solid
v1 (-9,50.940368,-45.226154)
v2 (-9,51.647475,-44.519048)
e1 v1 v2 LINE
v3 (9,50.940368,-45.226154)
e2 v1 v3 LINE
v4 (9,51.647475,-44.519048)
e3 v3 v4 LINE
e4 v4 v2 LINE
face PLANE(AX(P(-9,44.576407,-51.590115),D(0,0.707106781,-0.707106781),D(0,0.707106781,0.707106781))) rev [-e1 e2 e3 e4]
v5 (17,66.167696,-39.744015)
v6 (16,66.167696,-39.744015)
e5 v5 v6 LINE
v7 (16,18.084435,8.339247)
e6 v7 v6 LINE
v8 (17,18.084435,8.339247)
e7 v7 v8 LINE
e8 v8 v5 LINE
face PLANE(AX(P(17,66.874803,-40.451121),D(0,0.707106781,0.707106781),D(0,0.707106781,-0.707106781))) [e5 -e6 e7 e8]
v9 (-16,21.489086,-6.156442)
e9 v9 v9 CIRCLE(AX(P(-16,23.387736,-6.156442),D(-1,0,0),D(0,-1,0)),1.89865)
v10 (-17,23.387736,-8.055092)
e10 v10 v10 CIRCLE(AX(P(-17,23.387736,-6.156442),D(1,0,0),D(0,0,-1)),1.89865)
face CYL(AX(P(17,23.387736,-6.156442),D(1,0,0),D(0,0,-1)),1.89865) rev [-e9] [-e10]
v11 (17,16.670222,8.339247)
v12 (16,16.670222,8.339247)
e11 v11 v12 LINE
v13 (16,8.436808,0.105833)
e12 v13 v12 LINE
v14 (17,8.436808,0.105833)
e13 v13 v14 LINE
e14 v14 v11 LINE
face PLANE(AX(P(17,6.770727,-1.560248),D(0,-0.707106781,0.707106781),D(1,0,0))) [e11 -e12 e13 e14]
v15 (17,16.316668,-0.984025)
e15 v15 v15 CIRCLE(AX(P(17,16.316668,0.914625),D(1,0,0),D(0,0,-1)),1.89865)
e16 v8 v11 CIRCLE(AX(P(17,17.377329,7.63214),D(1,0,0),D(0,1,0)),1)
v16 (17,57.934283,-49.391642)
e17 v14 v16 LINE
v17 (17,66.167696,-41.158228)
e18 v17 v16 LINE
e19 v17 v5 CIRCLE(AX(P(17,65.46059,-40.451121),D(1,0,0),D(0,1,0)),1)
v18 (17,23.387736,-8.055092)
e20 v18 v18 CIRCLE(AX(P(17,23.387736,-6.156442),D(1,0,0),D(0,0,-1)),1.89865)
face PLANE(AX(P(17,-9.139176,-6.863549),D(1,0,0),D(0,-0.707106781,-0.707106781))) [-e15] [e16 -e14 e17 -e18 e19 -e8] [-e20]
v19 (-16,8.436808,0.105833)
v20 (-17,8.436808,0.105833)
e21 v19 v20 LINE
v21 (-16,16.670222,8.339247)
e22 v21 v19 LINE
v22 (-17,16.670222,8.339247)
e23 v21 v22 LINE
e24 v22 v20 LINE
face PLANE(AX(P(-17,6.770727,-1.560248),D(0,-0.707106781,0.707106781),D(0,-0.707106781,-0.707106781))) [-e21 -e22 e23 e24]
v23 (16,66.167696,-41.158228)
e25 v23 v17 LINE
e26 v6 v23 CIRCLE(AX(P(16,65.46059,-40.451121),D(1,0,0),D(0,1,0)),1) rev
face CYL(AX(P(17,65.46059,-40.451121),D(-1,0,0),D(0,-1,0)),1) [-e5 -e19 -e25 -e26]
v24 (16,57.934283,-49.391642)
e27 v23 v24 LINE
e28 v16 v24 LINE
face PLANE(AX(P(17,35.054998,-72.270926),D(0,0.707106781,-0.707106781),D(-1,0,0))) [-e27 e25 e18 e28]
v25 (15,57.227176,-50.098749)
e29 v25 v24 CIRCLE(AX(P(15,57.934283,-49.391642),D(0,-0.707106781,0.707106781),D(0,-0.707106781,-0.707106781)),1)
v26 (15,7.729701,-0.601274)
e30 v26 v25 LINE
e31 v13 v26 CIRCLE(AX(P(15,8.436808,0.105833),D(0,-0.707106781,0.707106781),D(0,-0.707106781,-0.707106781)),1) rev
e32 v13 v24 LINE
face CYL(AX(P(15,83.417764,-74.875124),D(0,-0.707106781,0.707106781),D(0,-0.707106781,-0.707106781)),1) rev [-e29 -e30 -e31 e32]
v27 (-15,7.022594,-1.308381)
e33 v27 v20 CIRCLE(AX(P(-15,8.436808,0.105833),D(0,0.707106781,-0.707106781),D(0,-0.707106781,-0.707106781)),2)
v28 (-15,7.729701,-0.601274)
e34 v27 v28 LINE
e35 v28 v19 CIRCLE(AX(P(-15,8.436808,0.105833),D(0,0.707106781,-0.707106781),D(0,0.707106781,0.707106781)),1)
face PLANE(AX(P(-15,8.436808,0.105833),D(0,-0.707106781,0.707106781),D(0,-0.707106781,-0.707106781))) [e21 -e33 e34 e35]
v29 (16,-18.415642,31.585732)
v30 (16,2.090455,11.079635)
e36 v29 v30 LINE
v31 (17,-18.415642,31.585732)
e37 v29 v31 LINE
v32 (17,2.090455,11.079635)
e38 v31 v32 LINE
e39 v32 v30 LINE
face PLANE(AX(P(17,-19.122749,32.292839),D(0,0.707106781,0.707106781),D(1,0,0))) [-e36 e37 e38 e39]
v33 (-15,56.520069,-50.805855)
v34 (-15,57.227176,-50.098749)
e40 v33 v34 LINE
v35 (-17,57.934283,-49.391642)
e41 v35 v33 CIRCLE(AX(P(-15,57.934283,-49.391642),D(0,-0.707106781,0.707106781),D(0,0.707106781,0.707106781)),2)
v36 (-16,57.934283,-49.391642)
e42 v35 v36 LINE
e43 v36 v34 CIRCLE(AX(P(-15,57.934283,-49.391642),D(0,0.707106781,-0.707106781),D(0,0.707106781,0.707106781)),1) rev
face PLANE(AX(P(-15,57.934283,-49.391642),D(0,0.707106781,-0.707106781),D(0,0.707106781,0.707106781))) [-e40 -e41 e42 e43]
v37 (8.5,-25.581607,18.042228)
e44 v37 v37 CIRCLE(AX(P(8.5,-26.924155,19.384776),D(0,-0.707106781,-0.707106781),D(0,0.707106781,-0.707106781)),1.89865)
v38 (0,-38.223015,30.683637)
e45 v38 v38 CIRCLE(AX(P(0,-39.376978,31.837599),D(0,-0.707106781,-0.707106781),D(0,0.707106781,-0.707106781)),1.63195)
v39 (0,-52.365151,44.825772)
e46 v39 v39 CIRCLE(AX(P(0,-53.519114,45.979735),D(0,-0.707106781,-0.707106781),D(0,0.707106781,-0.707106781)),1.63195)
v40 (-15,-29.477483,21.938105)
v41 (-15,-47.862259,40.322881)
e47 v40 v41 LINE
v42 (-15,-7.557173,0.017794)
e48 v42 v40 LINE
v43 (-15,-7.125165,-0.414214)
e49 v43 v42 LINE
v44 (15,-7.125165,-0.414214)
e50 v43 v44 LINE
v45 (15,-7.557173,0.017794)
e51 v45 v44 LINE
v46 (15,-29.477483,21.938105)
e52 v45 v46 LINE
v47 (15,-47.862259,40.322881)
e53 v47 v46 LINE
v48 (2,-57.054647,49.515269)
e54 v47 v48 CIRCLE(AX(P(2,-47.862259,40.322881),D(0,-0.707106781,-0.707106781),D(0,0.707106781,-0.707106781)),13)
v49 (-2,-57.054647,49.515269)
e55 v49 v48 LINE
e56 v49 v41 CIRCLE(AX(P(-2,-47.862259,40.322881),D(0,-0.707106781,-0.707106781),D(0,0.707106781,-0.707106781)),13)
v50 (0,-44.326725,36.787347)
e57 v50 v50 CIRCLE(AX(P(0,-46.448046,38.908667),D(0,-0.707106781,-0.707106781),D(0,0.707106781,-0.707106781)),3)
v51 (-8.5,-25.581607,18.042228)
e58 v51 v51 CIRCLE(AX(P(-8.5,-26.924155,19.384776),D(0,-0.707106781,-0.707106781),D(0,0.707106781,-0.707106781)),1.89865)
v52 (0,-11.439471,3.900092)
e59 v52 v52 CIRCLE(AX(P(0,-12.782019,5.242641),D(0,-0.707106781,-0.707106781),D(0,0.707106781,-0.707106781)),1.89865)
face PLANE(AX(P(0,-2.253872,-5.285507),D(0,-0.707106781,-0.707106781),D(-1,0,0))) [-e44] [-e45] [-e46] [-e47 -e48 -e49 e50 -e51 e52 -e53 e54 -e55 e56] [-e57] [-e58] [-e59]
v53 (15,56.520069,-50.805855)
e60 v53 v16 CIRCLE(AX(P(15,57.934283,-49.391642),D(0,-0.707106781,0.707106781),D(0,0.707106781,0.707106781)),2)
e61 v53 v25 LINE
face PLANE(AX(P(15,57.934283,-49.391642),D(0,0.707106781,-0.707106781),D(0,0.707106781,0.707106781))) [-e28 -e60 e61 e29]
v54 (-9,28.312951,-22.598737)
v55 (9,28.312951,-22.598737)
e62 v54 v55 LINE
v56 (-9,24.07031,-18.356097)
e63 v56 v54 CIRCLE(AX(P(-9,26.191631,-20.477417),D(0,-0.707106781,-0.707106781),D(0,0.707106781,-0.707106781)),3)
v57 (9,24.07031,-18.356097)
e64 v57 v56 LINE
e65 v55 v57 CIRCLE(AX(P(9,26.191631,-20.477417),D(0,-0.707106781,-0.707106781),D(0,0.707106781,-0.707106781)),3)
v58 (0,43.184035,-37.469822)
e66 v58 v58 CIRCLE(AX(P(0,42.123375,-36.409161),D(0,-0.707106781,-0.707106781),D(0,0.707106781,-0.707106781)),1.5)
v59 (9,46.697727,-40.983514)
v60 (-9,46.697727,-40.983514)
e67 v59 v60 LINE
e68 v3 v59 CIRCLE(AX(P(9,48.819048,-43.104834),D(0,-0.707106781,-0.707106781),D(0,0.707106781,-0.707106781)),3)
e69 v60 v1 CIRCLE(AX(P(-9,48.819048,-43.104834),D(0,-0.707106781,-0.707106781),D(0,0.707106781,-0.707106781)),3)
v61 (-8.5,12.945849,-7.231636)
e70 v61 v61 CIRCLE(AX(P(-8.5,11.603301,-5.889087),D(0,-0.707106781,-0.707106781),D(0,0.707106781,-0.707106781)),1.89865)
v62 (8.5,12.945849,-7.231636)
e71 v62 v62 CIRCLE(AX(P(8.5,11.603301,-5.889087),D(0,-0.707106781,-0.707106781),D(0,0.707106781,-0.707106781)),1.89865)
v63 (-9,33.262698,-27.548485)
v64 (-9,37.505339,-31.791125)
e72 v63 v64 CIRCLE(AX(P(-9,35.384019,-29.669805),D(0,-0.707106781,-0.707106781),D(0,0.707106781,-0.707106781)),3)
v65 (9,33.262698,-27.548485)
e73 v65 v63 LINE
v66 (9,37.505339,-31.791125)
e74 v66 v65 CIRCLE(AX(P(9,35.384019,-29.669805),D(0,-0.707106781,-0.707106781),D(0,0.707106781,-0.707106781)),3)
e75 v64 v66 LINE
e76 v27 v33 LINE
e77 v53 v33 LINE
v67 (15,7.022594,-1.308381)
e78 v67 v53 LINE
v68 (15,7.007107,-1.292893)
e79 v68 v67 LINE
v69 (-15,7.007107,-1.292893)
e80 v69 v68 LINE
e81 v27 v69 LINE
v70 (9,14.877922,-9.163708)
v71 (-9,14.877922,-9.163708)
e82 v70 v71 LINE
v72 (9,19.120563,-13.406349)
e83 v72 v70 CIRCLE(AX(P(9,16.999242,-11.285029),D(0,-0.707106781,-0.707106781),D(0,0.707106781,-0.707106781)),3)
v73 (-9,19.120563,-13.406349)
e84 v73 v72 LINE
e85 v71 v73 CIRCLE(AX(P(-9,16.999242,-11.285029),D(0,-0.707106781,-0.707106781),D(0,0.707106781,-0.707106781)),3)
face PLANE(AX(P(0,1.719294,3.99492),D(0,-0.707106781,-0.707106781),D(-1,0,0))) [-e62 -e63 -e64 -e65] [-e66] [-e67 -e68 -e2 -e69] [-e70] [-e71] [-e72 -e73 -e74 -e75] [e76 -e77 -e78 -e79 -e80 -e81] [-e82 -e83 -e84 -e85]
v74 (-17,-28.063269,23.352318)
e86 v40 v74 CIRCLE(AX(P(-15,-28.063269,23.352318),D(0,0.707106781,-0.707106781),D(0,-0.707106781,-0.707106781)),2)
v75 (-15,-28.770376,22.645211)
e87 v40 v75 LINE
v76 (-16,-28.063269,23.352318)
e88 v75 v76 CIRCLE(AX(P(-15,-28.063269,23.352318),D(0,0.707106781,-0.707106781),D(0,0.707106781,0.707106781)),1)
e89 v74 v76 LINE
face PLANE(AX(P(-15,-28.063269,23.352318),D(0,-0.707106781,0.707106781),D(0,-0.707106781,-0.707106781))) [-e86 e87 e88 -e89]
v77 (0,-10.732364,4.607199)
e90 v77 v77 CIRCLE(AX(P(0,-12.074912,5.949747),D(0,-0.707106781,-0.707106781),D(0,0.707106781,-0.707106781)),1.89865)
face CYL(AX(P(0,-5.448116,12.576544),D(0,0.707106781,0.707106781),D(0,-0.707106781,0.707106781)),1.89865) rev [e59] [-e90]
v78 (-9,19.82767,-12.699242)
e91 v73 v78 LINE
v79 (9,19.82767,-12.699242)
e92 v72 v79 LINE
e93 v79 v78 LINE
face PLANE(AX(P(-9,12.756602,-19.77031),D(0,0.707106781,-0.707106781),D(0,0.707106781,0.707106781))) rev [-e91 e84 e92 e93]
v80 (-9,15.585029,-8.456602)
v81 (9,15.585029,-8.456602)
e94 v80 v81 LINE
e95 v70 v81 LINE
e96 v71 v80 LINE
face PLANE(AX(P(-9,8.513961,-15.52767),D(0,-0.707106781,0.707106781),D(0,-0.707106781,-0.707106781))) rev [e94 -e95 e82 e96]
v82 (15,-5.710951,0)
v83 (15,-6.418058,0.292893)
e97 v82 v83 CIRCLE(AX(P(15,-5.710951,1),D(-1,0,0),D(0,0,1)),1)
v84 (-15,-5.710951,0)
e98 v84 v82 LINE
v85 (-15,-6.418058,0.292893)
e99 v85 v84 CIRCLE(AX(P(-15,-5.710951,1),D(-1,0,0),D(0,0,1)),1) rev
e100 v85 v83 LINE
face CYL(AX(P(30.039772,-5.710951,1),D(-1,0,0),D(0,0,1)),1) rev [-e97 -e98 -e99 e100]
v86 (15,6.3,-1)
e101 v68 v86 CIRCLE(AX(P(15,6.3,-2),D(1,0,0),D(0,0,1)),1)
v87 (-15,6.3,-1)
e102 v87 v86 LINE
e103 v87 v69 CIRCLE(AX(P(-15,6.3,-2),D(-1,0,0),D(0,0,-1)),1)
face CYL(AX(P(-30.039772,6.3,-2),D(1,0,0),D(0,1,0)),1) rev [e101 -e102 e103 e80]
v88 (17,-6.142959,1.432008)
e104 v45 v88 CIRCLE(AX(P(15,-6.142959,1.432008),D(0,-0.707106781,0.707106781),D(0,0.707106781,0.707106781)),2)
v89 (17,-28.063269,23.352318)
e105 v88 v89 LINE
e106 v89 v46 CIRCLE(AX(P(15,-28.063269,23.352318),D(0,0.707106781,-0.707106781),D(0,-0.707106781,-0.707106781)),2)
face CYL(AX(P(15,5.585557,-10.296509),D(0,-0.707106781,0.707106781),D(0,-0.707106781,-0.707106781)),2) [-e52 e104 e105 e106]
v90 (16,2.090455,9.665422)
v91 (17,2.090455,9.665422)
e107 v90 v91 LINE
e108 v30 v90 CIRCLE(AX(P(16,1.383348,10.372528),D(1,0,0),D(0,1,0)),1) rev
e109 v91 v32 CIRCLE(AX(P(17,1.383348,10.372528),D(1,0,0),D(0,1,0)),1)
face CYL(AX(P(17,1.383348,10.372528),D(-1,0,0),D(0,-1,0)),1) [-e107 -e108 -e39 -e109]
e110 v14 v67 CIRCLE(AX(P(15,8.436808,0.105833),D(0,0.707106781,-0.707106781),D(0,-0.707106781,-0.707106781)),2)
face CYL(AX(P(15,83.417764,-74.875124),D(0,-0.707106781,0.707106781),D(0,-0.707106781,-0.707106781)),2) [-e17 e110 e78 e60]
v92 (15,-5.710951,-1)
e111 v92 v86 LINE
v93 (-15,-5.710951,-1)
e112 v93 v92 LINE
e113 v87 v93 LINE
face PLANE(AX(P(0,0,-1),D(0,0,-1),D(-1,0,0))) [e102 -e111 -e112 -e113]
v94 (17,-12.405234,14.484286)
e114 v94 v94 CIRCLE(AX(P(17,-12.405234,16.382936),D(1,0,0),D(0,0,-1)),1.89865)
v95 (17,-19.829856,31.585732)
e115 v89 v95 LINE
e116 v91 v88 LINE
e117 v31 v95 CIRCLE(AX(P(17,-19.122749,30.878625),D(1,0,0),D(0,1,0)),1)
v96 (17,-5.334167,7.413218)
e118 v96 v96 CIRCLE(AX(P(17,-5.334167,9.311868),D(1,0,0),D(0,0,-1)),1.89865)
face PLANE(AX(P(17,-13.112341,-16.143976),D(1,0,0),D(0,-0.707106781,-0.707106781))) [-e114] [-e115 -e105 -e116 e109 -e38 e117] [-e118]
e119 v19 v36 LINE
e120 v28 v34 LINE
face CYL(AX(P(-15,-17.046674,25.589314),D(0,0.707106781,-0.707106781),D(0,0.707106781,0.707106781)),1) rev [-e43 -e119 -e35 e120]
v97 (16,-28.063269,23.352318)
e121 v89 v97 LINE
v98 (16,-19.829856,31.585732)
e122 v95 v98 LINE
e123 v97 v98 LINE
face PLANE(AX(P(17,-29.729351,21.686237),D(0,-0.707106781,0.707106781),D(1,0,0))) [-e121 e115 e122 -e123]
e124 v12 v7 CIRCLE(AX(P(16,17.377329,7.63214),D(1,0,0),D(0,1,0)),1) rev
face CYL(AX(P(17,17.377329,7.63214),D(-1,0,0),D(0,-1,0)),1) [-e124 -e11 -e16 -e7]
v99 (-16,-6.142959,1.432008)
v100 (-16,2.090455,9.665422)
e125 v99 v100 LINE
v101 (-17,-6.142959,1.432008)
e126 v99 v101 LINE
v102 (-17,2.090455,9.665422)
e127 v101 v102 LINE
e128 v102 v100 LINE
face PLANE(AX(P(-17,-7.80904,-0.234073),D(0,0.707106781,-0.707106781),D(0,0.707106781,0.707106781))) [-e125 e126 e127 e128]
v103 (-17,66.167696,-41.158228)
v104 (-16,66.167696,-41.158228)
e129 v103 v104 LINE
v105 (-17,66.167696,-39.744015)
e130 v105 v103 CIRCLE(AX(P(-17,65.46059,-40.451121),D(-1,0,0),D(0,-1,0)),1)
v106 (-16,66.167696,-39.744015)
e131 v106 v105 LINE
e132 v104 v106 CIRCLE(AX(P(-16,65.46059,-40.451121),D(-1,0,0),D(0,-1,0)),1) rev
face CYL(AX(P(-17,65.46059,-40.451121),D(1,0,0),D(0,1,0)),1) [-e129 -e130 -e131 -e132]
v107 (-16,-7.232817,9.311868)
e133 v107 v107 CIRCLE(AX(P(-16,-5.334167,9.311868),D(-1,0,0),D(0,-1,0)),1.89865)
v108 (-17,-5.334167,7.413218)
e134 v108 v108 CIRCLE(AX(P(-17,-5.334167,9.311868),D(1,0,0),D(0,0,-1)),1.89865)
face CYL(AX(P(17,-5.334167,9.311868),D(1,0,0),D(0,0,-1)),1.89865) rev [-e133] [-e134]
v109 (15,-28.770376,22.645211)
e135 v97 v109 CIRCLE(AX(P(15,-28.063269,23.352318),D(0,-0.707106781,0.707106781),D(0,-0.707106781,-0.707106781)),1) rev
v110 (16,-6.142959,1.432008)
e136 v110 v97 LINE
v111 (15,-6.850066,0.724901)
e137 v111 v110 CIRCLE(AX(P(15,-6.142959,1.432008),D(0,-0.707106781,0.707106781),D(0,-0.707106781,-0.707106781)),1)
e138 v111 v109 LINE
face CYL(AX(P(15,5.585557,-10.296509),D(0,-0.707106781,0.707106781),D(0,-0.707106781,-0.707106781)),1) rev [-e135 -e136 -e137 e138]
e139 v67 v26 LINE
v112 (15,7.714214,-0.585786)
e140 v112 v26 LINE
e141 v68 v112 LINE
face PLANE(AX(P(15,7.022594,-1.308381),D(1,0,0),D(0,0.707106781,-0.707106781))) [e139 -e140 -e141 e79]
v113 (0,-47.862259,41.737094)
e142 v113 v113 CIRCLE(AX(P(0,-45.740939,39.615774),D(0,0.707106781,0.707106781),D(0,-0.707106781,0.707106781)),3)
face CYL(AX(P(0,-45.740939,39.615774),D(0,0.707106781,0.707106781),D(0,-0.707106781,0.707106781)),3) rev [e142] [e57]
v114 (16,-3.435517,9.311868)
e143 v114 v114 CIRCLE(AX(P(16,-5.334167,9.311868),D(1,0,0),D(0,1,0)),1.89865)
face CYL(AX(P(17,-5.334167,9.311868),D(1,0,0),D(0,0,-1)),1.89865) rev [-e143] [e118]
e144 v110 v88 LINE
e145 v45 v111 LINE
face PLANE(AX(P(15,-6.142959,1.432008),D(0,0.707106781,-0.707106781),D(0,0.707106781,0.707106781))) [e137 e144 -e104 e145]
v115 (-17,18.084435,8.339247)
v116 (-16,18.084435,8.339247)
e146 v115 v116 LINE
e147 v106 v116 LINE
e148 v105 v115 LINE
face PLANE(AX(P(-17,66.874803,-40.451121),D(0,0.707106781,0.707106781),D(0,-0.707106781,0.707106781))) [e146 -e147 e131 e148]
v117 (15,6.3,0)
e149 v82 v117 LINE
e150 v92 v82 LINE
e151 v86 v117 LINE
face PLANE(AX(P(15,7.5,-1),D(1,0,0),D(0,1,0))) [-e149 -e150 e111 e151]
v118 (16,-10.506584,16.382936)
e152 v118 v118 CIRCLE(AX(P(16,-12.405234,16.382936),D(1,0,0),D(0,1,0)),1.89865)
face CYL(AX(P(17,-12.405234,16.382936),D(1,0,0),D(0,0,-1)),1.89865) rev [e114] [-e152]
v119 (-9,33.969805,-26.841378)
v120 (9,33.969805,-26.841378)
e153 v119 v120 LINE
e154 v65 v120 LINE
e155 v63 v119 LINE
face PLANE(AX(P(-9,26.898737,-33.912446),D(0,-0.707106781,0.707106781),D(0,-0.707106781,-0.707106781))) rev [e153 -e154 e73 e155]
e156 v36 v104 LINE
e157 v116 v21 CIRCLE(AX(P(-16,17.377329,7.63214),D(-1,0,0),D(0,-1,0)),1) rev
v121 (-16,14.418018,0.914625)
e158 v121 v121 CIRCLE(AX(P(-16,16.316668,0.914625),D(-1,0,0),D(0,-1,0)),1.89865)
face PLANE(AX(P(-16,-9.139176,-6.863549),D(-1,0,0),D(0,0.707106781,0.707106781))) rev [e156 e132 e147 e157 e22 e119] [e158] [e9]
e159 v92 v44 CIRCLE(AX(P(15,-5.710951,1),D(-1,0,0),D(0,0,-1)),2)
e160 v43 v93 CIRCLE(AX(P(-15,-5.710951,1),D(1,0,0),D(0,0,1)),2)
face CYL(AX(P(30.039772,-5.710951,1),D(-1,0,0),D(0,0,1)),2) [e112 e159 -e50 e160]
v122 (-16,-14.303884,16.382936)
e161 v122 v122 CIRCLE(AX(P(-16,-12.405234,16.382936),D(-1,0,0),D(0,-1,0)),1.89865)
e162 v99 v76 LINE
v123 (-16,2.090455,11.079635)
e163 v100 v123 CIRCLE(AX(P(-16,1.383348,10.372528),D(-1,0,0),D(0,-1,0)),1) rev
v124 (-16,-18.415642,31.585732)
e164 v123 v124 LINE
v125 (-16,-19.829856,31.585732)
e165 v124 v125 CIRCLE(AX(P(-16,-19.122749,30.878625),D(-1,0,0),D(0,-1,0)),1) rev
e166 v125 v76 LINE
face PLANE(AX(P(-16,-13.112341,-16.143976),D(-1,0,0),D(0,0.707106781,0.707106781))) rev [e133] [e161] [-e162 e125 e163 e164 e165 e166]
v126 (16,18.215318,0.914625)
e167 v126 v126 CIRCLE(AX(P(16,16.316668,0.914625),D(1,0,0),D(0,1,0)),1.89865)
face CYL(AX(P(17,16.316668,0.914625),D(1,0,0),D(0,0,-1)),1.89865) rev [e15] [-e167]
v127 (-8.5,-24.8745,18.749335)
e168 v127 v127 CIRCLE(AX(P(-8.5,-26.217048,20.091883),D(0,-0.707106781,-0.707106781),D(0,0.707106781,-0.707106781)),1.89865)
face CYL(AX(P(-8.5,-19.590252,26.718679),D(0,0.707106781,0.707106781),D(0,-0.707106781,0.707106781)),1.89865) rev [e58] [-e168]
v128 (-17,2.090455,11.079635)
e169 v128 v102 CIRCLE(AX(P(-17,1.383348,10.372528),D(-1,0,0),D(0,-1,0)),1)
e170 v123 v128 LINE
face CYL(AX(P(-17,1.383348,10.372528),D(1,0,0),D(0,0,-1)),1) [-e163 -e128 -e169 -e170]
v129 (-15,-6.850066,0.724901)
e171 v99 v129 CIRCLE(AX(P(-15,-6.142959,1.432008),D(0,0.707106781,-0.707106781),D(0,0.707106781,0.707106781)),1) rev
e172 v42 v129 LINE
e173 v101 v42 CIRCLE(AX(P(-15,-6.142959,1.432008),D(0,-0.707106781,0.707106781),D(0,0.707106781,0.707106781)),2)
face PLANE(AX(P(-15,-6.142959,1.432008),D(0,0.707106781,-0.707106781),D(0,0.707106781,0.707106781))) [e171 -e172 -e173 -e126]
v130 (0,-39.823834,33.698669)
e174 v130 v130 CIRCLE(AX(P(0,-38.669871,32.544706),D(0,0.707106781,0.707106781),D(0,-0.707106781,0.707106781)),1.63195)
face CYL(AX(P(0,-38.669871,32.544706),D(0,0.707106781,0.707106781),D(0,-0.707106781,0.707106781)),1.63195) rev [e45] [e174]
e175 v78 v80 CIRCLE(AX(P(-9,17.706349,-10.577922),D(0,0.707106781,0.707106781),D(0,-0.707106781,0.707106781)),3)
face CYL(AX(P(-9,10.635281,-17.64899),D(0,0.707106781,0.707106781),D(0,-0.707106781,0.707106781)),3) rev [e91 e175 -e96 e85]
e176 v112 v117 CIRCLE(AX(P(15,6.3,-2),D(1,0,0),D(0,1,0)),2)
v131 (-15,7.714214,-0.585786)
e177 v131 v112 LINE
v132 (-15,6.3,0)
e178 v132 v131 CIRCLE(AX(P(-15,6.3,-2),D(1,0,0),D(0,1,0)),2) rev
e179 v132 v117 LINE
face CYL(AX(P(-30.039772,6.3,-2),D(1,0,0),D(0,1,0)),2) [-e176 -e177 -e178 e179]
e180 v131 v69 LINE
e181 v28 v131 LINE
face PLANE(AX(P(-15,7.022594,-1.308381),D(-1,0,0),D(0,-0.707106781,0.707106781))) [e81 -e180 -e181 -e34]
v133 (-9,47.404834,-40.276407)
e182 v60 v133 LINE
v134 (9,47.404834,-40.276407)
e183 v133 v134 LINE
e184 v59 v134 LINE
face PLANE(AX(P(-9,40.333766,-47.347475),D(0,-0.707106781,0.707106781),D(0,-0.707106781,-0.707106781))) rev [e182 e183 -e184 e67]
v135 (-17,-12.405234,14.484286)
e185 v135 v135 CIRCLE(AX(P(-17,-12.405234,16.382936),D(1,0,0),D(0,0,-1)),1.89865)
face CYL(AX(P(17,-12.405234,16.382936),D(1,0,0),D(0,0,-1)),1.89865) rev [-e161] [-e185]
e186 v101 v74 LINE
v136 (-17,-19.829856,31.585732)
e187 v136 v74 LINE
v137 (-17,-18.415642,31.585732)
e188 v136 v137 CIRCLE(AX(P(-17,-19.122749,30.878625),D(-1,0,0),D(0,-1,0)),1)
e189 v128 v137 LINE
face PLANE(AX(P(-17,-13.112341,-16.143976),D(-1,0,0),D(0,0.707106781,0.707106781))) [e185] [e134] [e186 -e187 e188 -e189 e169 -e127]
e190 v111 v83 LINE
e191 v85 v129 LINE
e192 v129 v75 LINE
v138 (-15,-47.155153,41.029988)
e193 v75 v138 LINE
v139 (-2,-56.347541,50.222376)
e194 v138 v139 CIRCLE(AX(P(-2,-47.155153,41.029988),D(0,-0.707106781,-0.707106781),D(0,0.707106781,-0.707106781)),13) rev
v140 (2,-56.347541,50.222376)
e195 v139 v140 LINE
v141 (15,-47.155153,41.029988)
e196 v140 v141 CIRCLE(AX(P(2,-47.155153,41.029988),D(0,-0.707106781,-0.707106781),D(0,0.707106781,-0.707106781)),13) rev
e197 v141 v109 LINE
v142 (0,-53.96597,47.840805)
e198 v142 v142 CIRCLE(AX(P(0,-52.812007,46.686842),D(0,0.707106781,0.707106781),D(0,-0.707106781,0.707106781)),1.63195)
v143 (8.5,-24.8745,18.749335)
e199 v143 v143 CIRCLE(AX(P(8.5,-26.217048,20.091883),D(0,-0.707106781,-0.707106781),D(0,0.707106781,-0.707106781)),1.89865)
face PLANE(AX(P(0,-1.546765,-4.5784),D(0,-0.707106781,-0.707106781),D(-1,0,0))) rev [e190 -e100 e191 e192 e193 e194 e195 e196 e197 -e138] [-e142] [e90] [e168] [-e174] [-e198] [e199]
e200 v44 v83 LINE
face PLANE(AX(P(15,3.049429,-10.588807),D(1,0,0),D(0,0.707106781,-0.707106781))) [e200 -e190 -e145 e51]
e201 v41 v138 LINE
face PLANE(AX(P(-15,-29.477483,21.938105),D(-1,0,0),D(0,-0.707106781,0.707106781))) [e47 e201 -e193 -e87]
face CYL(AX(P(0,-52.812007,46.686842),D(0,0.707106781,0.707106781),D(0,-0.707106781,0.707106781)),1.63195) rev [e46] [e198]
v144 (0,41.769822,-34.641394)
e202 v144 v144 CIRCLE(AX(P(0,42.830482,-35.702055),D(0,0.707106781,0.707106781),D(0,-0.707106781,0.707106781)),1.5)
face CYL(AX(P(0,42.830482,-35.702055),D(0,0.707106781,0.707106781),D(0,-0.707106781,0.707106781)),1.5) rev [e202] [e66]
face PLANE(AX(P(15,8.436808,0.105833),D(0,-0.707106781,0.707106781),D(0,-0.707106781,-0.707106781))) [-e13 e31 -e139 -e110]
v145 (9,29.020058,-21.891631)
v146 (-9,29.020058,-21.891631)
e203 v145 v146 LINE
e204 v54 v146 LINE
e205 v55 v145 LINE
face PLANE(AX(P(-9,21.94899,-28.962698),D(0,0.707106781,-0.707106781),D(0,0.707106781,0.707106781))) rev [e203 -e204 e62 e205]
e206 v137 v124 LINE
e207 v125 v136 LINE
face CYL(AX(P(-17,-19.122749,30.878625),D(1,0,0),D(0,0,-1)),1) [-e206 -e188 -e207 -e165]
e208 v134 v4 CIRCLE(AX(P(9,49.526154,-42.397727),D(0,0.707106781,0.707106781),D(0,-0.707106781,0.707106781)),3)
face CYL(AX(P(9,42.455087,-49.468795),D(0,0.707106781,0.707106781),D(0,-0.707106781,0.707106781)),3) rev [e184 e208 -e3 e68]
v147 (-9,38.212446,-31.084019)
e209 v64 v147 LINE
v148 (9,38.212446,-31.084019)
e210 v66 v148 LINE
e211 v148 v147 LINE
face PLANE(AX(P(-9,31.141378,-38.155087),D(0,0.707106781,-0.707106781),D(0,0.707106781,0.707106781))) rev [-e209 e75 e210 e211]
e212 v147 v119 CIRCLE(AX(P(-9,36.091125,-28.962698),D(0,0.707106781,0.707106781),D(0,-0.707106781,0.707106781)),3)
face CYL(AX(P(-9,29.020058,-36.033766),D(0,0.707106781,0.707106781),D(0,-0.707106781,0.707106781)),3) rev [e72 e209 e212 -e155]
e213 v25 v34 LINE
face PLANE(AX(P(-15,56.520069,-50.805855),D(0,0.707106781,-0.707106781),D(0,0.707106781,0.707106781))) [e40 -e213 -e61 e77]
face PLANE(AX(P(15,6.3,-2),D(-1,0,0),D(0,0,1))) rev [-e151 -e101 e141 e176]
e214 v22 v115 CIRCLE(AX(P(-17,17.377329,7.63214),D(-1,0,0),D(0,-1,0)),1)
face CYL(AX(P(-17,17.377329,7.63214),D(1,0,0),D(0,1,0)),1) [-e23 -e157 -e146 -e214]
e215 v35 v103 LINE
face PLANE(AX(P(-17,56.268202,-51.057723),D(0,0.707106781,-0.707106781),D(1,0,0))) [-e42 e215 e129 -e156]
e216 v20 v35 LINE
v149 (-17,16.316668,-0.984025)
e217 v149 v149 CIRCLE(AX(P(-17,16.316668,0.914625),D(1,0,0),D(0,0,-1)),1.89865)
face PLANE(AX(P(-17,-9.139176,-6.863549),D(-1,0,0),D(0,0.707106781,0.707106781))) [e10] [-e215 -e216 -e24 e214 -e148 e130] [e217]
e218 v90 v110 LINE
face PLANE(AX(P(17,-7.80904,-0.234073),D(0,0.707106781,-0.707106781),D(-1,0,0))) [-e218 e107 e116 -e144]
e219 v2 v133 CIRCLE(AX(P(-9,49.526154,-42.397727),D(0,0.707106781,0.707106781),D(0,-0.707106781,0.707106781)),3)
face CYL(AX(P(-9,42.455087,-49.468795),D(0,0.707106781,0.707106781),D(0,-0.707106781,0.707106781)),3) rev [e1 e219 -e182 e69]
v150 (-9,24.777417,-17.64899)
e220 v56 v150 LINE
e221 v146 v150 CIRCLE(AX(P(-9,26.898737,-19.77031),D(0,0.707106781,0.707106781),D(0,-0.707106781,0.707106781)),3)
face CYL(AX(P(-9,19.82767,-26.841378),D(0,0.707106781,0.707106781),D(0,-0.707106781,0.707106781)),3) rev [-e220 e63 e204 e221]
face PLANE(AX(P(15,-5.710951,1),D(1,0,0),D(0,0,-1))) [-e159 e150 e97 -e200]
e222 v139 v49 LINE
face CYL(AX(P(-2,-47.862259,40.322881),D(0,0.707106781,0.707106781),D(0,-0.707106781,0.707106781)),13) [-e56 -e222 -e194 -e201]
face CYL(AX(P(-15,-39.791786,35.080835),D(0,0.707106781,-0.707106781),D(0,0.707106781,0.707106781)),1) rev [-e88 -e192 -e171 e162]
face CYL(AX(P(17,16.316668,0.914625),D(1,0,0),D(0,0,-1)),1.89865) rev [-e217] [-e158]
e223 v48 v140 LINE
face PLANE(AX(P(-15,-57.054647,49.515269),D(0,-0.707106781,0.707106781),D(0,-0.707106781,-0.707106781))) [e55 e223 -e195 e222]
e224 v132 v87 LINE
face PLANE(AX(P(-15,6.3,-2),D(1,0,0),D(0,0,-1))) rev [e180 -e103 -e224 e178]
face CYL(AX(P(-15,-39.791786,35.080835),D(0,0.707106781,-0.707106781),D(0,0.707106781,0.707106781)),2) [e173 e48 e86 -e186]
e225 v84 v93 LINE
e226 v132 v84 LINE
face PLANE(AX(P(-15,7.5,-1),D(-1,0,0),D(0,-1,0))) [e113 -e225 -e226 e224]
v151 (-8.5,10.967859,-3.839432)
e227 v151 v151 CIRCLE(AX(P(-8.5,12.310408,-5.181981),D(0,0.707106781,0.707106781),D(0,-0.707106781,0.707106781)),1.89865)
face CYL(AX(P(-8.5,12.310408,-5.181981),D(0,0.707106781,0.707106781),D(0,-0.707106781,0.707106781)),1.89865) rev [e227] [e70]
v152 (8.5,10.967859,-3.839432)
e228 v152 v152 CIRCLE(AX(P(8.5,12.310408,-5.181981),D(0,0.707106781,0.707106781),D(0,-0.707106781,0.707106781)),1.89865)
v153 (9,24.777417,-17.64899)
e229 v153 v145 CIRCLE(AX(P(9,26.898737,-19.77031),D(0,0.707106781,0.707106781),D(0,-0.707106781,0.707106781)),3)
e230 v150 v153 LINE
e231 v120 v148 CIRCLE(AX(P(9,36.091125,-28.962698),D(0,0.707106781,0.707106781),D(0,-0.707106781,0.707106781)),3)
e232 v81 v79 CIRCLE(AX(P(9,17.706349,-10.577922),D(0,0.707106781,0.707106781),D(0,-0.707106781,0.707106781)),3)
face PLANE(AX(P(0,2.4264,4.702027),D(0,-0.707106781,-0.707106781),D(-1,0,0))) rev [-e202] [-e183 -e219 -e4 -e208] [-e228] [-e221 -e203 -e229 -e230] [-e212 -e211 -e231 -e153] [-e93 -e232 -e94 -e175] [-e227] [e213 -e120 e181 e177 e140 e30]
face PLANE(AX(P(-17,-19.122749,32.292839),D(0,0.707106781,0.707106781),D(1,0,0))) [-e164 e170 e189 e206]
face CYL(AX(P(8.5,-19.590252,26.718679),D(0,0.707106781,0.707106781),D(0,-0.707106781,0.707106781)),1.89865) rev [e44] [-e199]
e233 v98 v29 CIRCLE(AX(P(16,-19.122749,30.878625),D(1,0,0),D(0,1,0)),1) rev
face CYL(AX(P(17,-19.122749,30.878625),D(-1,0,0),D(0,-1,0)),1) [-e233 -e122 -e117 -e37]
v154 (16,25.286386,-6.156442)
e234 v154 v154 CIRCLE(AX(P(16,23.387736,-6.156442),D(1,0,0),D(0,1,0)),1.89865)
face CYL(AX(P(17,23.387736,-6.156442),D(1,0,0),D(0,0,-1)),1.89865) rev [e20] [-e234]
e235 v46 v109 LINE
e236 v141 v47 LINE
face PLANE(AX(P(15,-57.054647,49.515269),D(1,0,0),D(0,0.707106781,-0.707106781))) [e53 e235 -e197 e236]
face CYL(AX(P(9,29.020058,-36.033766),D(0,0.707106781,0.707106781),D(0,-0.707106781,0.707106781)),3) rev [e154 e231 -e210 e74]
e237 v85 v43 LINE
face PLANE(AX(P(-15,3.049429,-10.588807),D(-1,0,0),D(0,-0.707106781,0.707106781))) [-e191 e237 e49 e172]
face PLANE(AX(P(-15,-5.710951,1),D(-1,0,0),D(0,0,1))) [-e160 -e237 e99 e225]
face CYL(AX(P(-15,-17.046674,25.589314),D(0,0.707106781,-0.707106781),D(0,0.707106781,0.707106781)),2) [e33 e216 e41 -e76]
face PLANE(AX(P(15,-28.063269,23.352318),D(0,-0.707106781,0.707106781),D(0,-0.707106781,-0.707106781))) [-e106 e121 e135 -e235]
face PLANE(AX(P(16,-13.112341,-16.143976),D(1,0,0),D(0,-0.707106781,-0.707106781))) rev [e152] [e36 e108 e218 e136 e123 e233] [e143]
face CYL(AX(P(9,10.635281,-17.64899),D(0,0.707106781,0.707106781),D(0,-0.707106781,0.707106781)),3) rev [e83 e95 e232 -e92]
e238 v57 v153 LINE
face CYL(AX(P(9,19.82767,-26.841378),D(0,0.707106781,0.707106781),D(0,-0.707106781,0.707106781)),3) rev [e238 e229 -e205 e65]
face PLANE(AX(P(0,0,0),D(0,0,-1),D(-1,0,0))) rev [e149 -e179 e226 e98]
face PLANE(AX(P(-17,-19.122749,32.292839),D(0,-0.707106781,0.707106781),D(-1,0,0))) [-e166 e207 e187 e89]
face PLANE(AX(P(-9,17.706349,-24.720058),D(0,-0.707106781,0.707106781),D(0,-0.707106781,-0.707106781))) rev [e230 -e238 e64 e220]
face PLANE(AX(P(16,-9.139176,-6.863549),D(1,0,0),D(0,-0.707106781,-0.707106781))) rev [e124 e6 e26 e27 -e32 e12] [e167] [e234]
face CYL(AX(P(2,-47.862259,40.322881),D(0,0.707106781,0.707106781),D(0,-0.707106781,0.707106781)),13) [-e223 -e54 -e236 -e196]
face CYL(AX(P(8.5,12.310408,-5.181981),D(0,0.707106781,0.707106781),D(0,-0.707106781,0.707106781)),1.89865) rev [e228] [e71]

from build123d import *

# Parameters (mm, degrees)
BASE_FLANGE1_DEPTH     = 1
SKETCHED_START         = -30
SKETCHED_BEND5_DEPTH   = 60
SKETCHED_BEND5_2_DEPTH = 15
SKETCHED_START_2       = 15
SKETCHED_BEND5_3_DEPTH = 15
SKETCHED_BEND5_4_DEPTH = 60
SKETCHED_START_3       = -15
SKETCHED_BEND5_5_DEPTH = 30
SKETCHED_BEND6_DEPTH   = 60
SKETCHED_BEND6_2_DEPTH = 15
SKETCHED_BEND6_3_DEPTH = 15
SKETCHED_BEND6_4_DEPTH = 30
SKETCHED_BEND6_5_DEPTH = 60
SKETCHED_START_4       = -36.356310605
SKETCHED_BEND7_DEPTH   = 31
SKETCHED_BEND7_2_DEPTH = 31
SKETCHED_START_5       = 5.890889039
SKETCHED_BEND8_DEPTH   = 70
SKETCHED_BEND8_2_DEPTH = 70
CUT_EXTRUDE1_DEPTH     = 10
F_6_CLEARANCE_HOLE4_D  = 3.7973
F_6_CLEARANCE_HOLE2_D  = 3.7973
FILLET1_R              = 1
F_4_CLEARANCE_HOLE1_D  = 3.2639
F_6_0MM_DOWEL_HOLE1_D  = 6
F_3_0MM_DOWEL_HOLE1_D  = 3
FILLET2_R              = 13


# Read off the part's stored shape, not the designer's step: Sketched Bend5, Sketched Bend6, Sketched Bend7, Sketched Bend8
# Sheet-metal steps are written as plain solids
with BuildPart() as part:
    # Sketch1 → Base-Flange1 (new body)
    with BuildSketch(Plane.XY):
        Polygon((-30, -38.5), (-15, -38.5), (-15, -77.5), (15, -77.5), (15, -38.5), (30, -38.5), (30, -7.5), (15, -7.5), (15, 7.5), (30, 7.5), (30, 77.5), (15, 77.5), (-15, 77.5), (-30, 77.5), (-30, 7.5), (-15, 7.5), (-15, -7.5), (-30, -7.5), align=None)
    extrude(amount=-BASE_FLANGE1_DEPTH)

    # Sketched Bend5 outline → Sketched Bend5 (cut)
    with BuildSketch(Plane.YZ.offset(SKETCHED_START)):
        with BuildLine():
            Line((7.714213562, -0.585786438), (8.128427124, -1))
            Line((8.128427124, -1), (77.5, -1))
            Line((77.5, -1), (77.5, 0))
            Line((77.5, 0), (6.3, 0))
            ThreePointArc((6.3, 0), (7.065366865, -0.152240935), (7.714213562, -0.585786438))
        make_face()
    extrude(amount=SKETCHED_BEND5_DEPTH, mode=Mode.SUBTRACT)

    # Sketched Bend5 2 outline → Sketched Bend5 2 (cut)
    with BuildSketch(Plane.YZ.offset(SKETCHED_START)):
        with BuildLine():
            Line((7.729701149, -0.601274024), (7.714213562, -0.585786438))
            ThreePointArc((7.714213562, -0.585786438), (7.610403483, -0.48909209), (7.5, -0.4))
            Line((7.5, -0.4), (7.5, -0.830975173))
            Line((7.5, -0.830975173), (7.729701149, -0.601274024))
        make_face()
    extrude(amount=SKETCHED_BEND5_2_DEPTH, mode=Mode.SUBTRACT)

    # Sketched Bend5 3 outline → Sketched Bend5 3 (cut)
    with BuildSketch(Plane.YZ.offset(SKETCHED_START_2)):
        with BuildLine():
            Line((7.729701149, -0.601274024), (7.714213562, -0.585786438))
            ThreePointArc((7.714213562, -0.585786438), (7.610403483, -0.48909209), (7.5, -0.4))
            Line((7.5, -0.4), (7.5, -0.830975173))
            Line((7.5, -0.830975173), (7.729701149, -0.601274024))
        make_face()
    extrude(amount=SKETCHED_BEND5_3_DEPTH, mode=Mode.SUBTRACT)

    # Sketched Bend5 4 outline → Sketched Bend5 4 (add)
    with BuildSketch(Plane.YZ.offset(SKETCHED_START)):
        Polygon((57.227175832, -50.098748707), (8.128427124, -1), (7.5, -1), (7.5, -0.830975173), (7.022594368, -1.308380805), (56.520069051, -50.805855488), align=None)
    extrude(amount=SKETCHED_BEND5_4_DEPTH)

    # Sketched Bend5 5 outline → Sketched Bend5 5 (add)
    with BuildSketch(Plane.YZ.offset(SKETCHED_START_3)):
        with BuildLine():
            Line((7.022594368, -1.308380805), (7.330975173, -1))
            Line((7.330975173, -1), (6.3, -1))
            ThreePointArc((6.3, -1), (6.682683432, -1.076120467), (7.007106781, -1.292893219))
            Line((7.007106781, -1.292893219), (7.022594368, -1.308380805))
        make_face()
    extrude(amount=SKETCHED_BEND5_5_DEPTH)

    # Sketched Bend6 outline → Sketched Bend6 (cut)
    with BuildSketch(Plane.YZ.offset(SKETCHED_START)):
        with BuildLine():
            ThreePointArc((-5.710951377, -1), (-6.476318242, -0.847759065), (-7.12516494, -0.414213562))
            Line((-7.12516494, -0.414213562), (-7.539378502, 0))
            Line((-7.539378502, 0), (-77.5, 0))
            Line((-77.5, 0), (-77.5, -1))
            Line((-77.5, -1), (-5.710951377, -1))
        make_face()
    extrude(amount=SKETCHED_BEND6_DEPTH, mode=Mode.SUBTRACT)

    # Sketched Bend6 2 outline → Sketched Bend6 2 (cut)
    with BuildSketch(Plane.YZ.offset(SKETCHED_START)):
        Polygon((-7.539378502, 0), (-7.5, -0.039378502), (-7.5, 0), align=None)
    extrude(amount=SKETCHED_BEND6_2_DEPTH, mode=Mode.SUBTRACT)

    # Sketched Bend6 3 outline → Sketched Bend6 3 (cut)
    with BuildSketch(Plane.YZ.offset(SKETCHED_START_2)):
        Polygon((-7.539378502, 0), (-7.5, -0.039378502), (-7.5, 0), align=None)
    extrude(amount=SKETCHED_BEND6_3_DEPTH, mode=Mode.SUBTRACT)

    # Sketched Bend6 4 outline → Sketched Bend6 4 (add)
    with BuildSketch(Plane.YZ.offset(SKETCHED_START_3)):
        with BuildLine():
            Line((-7.539378502, 0), (-5.710951377, 0))
            ThreePointArc((-5.710951377, 0), (-6.09363481, 0.076120467), (-6.418058159, 0.292893219))
            Line((-6.418058159, 0.292893219), (-56.347540704, 50.222375764))
            Line((-56.347540704, 50.222375764), (-57.054647485, 49.515268983))
            Line((-57.054647485, 49.515268983), (-7.539378502, 0))
        make_face()
    extrude(amount=SKETCHED_BEND6_4_DEPTH)

    # Sketched Bend6 5 outline → Sketched Bend6 5 (add)
    with BuildSketch(Plane.YZ.offset(SKETCHED_START)):
        Polygon((-29.477483019, 21.938104517), (-7.557172802, 0.0177943), (-6.850066021, 0.724901081), (-28.770376238, 22.645211298), align=None)
    extrude(amount=SKETCHED_BEND6_5_DEPTH)

    # Sketched Bend7 outline → Sketched Bend7 (cut)
    with BuildSketch(Plane(origin=(0, 0, 0), x_dir=(1, 0, 0), z_dir=(0, 0.707106781186546, -0.707106781186549)).offset(SKETCHED_START_4)):
        with BuildLine():
            ThreePointArc((-16.732050807, 4.331145665), (-16, 5.063196472), (-15, 5.331145665))
            Line((-15, 5.331145665), (-30, 5.331145665))
            Line((-30, 5.331145665), (-30, 4.331145665))
            Line((-30, 4.331145665), (-16.732050807, 4.331145665))
        make_face()
        with BuildLine():
            Line((30, 5.331145665), (15, 5.331145665))
            ThreePointArc((15, 5.331145665), (16, 5.063196472), (16.732050807, 4.331145665))
            Line((16.732050807, 4.331145665), (30, 4.331145665))
            Line((30, 4.331145665), (30, 5.331145665))
        make_face()
    extrude(amount=SKETCHED_BEND7_DEPTH, mode=Mode.SUBTRACT)

    # Sketched Bend7 2 outline → Sketched Bend7 2 (add)
    with BuildSketch(Plane(origin=(0, 0, 0), x_dir=(1, 0, 0), z_dir=(0, 0.707106781186546, -0.707106781186549)).offset(SKETCHED_START_4)):
        with BuildLine():
            Line((-15, 4.331145665), (-16.732050807, 4.331145665))
            ThreePointArc((-16.732050807, 4.331145665), (-16.931851652, 3.848783755), (-17, 3.331145665))
            Line((-17, 3.331145665), (-17, -9.312659845))
            Line((-17, -9.312659845), (-16, -9.312659845))
            Line((-16, -9.312659845), (-16, 3.331145665))
            ThreePointArc((-16, 3.331145665), (-15.707106781, 4.038252446), (-15, 4.331145665))
        make_face()
        with BuildLine():
            ThreePointArc((17, 3.331145665), (16.931851652, 3.848783755), (16.732050807, 4.331145665))
            Line((16.732050807, 4.331145665), (15, 4.331145665))
            ThreePointArc((15, 4.331145665), (15.707106781, 4.038252446), (16, 3.331145665))
            Line((16, 3.331145665), (16, -9.312659845))
            Line((16, -9.312659845), (17, -9.312659845))
            Line((17, -9.312659845), (17, 3.331145665))
        make_face()
    extrude(amount=SKETCHED_BEND7_2_DEPTH)

    # Sketched Bend8 outline → Sketched Bend8 (cut)
    with BuildSketch(Plane(origin=(0, 0, 0), x_dir=(1, 0, 0), z_dir=(0, 0.707106781186546, -0.707106781186549)).offset(SKETCHED_START_5)):
        with BuildLine():
            Line((-30, -5.040559159), (-16.732050807, -5.040559159))
            ThreePointArc((-16.732050807, -5.040559159), (-16, -4.308508352), (-15, -4.040559159))
            Line((-15, -4.040559159), (-30, -4.040559159))
            Line((-30, -4.040559159), (-30, -5.040559159))
        make_face()
        with BuildLine():
            Line((30, -4.040559159), (15, -4.040559159))
            ThreePointArc((15, -4.040559159), (16, -4.308508352), (16.732050807, -5.040559159))
            Line((16.732050807, -5.040559159), (30, -5.040559159))
            Line((30, -5.040559159), (30, -4.040559159))
        make_face()
    extrude(amount=SKETCHED_BEND8_DEPTH, mode=Mode.SUBTRACT)

    # Sketched Bend8 2 outline → Sketched Bend8 2 (add)
    with BuildSketch(Plane(origin=(0, 0, 0), x_dir=(1, 0, 0), z_dir=(0, 0.707106781186546, -0.707106781186549)).offset(SKETCHED_START_5)):
        with BuildLine():
            ThreePointArc((-16.732050807, -5.040559159), (-16.931851652, -5.522921069), (-17, -6.040559159))
            Line((-17, -6.040559159), (-17, -18.684364669))
            Line((-17, -18.684364669), (-16, -18.684364669))
            Line((-16, -18.684364669), (-16, -6.040559159))
            ThreePointArc((-16, -6.040559159), (-15.707106781, -5.333452378), (-15, -5.040559159))
            Line((-15, -5.040559159), (-16.732050807, -5.040559159))
        make_face()
        with BuildLine():
            Line((16.732050807, -5.040559159), (15, -5.040559159))
            ThreePointArc((15, -5.040559159), (15.707106781, -5.333452378), (16, -6.040559159))
            Line((16, -6.040559159), (16, -18.684364669))
            Line((16, -18.684364669), (17, -18.684364669))
            Line((17, -18.684364669), (17, -6.040559159))
            ThreePointArc((17, -6.040559159), (16.931851652, -5.522921069), (16.732050807, -5.040559159))
        make_face()
    extrude(amount=SKETCHED_BEND8_2_DEPTH)

    # Sketch36 → Cut-Extrude1 (cut)
    with BuildSketch(Plane(origin=(0, 3.564213562, 3.564213562), x_dir=(1, 0, 0), z_dir=(0, 0.7071067811865487, 0.7071067811865465))):
        with BuildLine():
            Line((-9, 23), (9, 23))
            ThreePointArc((9, 23), (12, 20), (9, 17))
            Line((9, 17), (-9, 17))
            ThreePointArc((-9, 17), (-12, 20), (-9, 23))
        make_face()
        with BuildLine():
            Line((-9, 36), (9, 36))
            ThreePointArc((9, 36), (12, 33), (9, 30))
            Line((9, 30), (-9, 30))
            ThreePointArc((-9, 30), (-12, 33), (-9, 36))
        make_face()
        with BuildLine():
            Line((-9, 49), (9, 49))
            ThreePointArc((9, 49), (12, 46), (9, 43))
            Line((9, 43), (-9, 43))
            ThreePointArc((-9, 43), (-12, 46), (-9, 49))
        make_face()
        with BuildLine():
            Line((-9, 68), (9, 68))
            ThreePointArc((9, 68), (12, 65), (9, 62))
            Line((9, 62), (-9, 62))
            ThreePointArc((-9, 62), (-12, 65), (-9, 68))
        make_face()
    extrude(amount=-CUT_EXTRUDE1_DEPTH, mode=Mode.SUBTRACT)

    # #6 Clearance Hole4 (through all)
    with Locations(Plane(origin=(0, 3.564213562, 3.564213562), x_dir=(1, 0, 0), z_dir=(0, 0.7071067811865487, 0.7071067811865465))):
        with Locations((-8.5, 12.368986284), (8.5, 12.368986284), (0, -12.745359227), (-8.5, -32.745359227), (8.5, -32.745359227)):
            Hole(F_6_CLEARANCE_HOLE4_D / 2)

    # #6 Clearance Hole2 (through all)
    with Locations(Plane(origin=(17, 0, 0), x_dir=(0, 0, -1), z_dir=(1, 0, 0))):
        with Locations((-9.311868306, -5.334166607), (-16.382936118, -12.405234419), (-0.914625389, 16.316668374), (6.156442422, 23.387736186)):
            Hole(F_6_CLEARANCE_HOLE2_D / 2)

    # Fillet1
    fillet1_edges = [part.edges().sort_by_distance(p)[0] for p in [
        (-16.5, -19.12274884, 32.292838695),
        (-16.5, 2.797561376, 10.372528478),
        (16.5, 2.797561376, 10.372528478),
        (16.5, -19.12274884, 32.292838695),
        (-16.5, 17.377328546, 9.046353373),
        (-16.5, 66.874803229, -40.45112131),
        (16.5, 66.874803229, -40.45112131),
        (16.5, 17.377328546, 9.046353373),
    ]]
    fillet(fillet1_edges, radius=FILLET1_R)

    # #4 Clearance Hole1 (through all)
    with Locations(Plane(origin=(0, -3.06258247, -3.06258247), x_dir=(1, 0, 0), z_dir=(0, 0.7071067811865487, 0.7071067811865465))):
        with Locations((0, -70.356310605), (0, -50.356310605)):
            Hole(F_4_CLEARANCE_HOLE1_D / 2)

    # Ø6.0mm Dowel Hole1 (through all)
    with Locations(Plane(origin=(0, -3.06258247, -3.06258247), x_dir=(1, 0, 0), z_dir=(0, 0.7071067811865487, 0.7071067811865465))):
        with Locations((0, -60.356310605)):
            Hole(F_6_0MM_DOWEL_HOLE1_D / 2)

    # Ø3.0mm Dowel Hole1 (through all)
    with Locations(Plane(origin=(0, 3.564213562, 3.564213562), x_dir=(1, 0, 0), z_dir=(0, 0.7071067811865487, 0.7071067811865465))):
        with Locations((0, 55.530889039)):
            Hole(F_3_0MM_DOWEL_HOLE1_D / 2)

    # Fillet2
    fillet2_edges = [part.edges().sort_by_distance(p)[0] for p in [
        (-15, -56.701094094, 49.868822373),
        (15, -56.701094094, 49.868822373),
    ]]
    fillet(fillet2_edges, radius=FILLET2_R)


solid = part.part
